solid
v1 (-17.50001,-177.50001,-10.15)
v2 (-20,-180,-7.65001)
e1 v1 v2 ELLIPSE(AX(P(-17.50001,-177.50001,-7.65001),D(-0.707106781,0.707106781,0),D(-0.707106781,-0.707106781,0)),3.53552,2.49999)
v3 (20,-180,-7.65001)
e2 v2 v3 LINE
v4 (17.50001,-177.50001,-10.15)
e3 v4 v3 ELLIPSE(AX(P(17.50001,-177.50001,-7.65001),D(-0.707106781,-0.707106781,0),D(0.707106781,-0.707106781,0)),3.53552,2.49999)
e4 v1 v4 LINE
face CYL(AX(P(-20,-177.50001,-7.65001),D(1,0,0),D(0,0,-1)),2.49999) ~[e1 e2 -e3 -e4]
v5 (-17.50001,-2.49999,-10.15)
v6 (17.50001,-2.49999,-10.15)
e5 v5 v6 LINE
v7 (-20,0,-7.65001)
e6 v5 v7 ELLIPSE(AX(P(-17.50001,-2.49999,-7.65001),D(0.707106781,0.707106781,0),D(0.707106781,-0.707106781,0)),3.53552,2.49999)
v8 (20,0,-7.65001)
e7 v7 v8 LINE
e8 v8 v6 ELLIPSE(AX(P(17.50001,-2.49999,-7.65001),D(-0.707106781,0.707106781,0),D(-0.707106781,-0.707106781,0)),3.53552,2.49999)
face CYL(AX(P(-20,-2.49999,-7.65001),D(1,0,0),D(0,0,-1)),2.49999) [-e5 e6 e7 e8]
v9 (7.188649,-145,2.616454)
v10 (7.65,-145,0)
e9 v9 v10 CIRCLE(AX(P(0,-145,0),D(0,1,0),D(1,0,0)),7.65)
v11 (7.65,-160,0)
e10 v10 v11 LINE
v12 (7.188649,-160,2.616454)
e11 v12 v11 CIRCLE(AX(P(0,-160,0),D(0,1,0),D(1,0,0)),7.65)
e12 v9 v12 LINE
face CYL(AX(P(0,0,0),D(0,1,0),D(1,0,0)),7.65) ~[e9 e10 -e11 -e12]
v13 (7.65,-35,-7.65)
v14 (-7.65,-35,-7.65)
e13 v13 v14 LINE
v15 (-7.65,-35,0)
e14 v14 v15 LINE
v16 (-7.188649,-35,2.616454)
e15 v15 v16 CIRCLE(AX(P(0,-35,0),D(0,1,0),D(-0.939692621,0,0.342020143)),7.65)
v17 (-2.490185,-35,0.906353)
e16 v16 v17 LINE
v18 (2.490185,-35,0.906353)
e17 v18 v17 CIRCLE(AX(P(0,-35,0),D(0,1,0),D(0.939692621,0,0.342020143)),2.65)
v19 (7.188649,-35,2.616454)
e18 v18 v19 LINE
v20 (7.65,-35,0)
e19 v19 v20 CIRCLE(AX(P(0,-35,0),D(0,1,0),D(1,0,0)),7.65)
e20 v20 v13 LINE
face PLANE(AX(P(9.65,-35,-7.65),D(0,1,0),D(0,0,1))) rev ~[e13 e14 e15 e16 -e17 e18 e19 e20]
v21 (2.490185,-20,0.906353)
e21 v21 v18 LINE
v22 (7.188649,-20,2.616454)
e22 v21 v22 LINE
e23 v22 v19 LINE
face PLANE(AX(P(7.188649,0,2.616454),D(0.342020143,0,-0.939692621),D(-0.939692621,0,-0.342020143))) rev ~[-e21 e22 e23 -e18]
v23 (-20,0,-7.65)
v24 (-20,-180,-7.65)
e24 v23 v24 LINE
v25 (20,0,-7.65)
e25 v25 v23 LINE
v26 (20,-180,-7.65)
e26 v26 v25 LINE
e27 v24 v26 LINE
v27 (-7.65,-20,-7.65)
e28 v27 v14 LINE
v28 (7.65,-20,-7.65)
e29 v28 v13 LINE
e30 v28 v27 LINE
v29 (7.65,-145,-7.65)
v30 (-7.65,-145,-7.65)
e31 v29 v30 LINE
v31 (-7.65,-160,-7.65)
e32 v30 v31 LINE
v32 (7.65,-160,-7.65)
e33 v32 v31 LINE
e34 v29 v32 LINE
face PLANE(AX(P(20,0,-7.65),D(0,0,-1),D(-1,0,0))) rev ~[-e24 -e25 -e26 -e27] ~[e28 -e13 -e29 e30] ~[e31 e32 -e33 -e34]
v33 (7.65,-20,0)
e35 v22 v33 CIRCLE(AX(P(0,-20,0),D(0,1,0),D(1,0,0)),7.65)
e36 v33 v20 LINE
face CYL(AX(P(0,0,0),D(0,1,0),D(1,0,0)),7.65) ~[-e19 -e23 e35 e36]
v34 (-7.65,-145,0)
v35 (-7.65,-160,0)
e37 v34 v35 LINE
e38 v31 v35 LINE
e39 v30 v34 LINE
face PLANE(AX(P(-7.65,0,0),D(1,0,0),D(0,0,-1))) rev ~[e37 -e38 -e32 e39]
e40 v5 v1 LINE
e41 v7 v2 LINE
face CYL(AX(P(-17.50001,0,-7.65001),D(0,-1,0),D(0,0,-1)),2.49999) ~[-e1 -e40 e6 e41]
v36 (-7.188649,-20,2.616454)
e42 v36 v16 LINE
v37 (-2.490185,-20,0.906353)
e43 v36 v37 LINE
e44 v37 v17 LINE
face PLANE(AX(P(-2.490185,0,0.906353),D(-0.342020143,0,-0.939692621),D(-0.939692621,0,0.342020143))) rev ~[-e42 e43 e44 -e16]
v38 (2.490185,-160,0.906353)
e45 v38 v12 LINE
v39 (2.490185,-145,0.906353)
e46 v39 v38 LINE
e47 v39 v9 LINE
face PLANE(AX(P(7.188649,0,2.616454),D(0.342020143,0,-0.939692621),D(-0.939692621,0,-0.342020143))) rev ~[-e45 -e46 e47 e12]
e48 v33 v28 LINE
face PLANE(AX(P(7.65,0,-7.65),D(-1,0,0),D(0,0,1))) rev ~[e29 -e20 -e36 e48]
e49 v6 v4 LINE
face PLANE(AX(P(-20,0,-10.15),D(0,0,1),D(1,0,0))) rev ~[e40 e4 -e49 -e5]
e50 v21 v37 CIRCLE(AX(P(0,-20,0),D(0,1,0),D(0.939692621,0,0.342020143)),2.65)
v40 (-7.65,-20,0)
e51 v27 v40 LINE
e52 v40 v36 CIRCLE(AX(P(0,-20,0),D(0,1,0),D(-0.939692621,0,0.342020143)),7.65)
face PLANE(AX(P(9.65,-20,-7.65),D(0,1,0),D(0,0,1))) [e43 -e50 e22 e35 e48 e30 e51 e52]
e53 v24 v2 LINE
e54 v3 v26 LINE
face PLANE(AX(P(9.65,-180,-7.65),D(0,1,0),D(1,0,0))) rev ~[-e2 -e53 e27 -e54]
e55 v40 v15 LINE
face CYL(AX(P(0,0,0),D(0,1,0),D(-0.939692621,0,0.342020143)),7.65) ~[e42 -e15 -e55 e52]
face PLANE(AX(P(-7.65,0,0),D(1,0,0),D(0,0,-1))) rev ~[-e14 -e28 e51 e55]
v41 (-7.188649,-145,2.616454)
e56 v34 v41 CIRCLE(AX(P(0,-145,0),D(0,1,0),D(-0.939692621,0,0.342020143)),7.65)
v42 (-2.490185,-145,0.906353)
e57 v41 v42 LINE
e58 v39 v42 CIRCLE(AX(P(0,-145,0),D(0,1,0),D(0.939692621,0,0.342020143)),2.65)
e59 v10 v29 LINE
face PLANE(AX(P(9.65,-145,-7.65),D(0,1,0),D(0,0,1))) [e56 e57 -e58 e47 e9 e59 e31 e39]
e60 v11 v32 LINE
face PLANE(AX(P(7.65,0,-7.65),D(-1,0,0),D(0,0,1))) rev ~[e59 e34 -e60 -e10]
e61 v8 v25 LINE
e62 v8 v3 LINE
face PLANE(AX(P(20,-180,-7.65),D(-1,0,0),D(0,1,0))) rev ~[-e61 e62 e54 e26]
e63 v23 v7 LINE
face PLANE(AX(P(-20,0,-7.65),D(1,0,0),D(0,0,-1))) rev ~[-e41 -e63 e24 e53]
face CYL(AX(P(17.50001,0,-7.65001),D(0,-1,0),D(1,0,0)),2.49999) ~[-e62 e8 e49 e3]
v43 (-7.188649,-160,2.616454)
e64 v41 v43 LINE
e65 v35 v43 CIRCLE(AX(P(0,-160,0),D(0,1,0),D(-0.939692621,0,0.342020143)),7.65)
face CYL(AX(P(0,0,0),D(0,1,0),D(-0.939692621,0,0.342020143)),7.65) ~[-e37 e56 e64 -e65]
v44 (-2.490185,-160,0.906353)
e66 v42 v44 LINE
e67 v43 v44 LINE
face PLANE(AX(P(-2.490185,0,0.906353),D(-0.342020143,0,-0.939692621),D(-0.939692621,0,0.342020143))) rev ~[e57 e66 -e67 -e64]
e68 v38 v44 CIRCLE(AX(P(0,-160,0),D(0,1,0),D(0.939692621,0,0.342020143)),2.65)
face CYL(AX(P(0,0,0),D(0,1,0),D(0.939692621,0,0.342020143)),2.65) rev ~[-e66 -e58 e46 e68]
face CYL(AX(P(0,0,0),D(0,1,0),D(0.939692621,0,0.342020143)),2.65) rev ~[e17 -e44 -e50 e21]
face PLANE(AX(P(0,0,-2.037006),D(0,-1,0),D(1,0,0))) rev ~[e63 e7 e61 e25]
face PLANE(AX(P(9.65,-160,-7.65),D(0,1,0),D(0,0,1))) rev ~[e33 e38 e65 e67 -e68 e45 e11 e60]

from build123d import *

# Parameters (mm, degrees)
F1_DEPTH = 180
F2_W     = 10.35
F2_H     = 20
F2_H_2   = 110
F3_DEPTH = 25
F4_DEPTH = 25
F5_DEPTH = 25
F6_R     = 2.49999


# Not quite as in the source:
# - a fillet or chamfer is up to 0.001 mm smaller than in the source, because OpenCascade refuses the exact size


with BuildPart() as f1:
    # F0 (on Front) → F1 (new body)
    with BuildSketch(Plane.XZ):
        with BuildLine():
            ThreePointArc((2.4901854451, 0.9063533798), (0, -2.65), (-2.4901854451, 0.9063533798))
            Line((-2.4901854451, 0.9063533798), (-7.188648549, 2.6164540964))
            ThreePointArc((-7.188648549, 2.6164540964), (-7.5337793105, 1.3284085592), (-7.65, 0))
            ThreePointArc((-7.65, 0), (-5.4093668761, -5.4093668761), (0, -7.65))
            ThreePointArc((0, -7.65), (5.4093668761, -5.4093668761), (7.65, 0))
            ThreePointArc((7.65, 0), (7.5337793105, 1.3284085592), (7.188648549, 2.6164540964))
            Line((7.188648549, 2.6164540964), (2.4901854451, 0.9063533798))
        make_face()
        with BuildLine():
            ThreePointArc((0, -7.65), (-5.4093668761, -5.4093668761), (-7.65, 0))
            Line((-7.65, 0), (-7.65, -7.65))
            Line((-7.65, -7.65), (0, -7.65))
        make_face()
        with BuildLine():
            Line((7.65, -7.65), (7.65, 0))
            ThreePointArc((7.65, 0), (5.4093668761, -5.4093668761), (0, -7.65))
            Line((0, -7.65), (7.65, -7.65))
        make_face()
        Polygon((7.65, -7.65), (0, -7.65), (-7.65, -7.65), (-20, -7.65), (-20, -10.15), (20, -10.15), (20, -7.65), align=None)
    extrude(amount=F1_DEPTH)

    # F2 (on face) → F3 (join)
    with BuildSketch(Plane.XY.offset(-7.65)):
        with Locations((14.825, -170)):
            Rectangle(F2_W, F2_H)
        with Locations((14.825, -90)):
            Rectangle(F2_W, F2_H_2)
        with Locations((14.825, -10)):
            Rectangle(F2_W, F2_H)
    extrude(amount=F3_DEPTH)

    # F4 (cut): faces of the model
    f4_faces = [f1.faces().sort_by_distance(p)[0] for p in [
        (9.65, -10, 4.85),
        (9.65, -90, 4.85),
        (9.65, -170, 4.85),
    ]]
    extrude(f4_faces, amount=F4_DEPTH, mode=Mode.SUBTRACT)

    # F5 (cut): faces of the model
    f5_faces = [f1.faces().sort_by_distance(p)[0] for p in [
        (9.65, -10, 4.85),
        (9.65, -90, 4.85),
        (9.65, -170, 4.85),
    ]]
    extrude(f5_faces, amount=-F5_DEPTH, mode=Mode.SUBTRACT)

    # F6 (radius 2.5 in the source; OpenCascade refuses exactly that, so slightly less here)
    f6_edges = [f1.edges().sort_by_distance(p)[0] for p in [
        (-20, -90, -10.15),
        (0, -180, -10.15),
        (20, -90, -10.15),
        (0, 0, -10.15),
    ]]
    fillet(f6_edges, radius=F6_R)


solid = f1.part
